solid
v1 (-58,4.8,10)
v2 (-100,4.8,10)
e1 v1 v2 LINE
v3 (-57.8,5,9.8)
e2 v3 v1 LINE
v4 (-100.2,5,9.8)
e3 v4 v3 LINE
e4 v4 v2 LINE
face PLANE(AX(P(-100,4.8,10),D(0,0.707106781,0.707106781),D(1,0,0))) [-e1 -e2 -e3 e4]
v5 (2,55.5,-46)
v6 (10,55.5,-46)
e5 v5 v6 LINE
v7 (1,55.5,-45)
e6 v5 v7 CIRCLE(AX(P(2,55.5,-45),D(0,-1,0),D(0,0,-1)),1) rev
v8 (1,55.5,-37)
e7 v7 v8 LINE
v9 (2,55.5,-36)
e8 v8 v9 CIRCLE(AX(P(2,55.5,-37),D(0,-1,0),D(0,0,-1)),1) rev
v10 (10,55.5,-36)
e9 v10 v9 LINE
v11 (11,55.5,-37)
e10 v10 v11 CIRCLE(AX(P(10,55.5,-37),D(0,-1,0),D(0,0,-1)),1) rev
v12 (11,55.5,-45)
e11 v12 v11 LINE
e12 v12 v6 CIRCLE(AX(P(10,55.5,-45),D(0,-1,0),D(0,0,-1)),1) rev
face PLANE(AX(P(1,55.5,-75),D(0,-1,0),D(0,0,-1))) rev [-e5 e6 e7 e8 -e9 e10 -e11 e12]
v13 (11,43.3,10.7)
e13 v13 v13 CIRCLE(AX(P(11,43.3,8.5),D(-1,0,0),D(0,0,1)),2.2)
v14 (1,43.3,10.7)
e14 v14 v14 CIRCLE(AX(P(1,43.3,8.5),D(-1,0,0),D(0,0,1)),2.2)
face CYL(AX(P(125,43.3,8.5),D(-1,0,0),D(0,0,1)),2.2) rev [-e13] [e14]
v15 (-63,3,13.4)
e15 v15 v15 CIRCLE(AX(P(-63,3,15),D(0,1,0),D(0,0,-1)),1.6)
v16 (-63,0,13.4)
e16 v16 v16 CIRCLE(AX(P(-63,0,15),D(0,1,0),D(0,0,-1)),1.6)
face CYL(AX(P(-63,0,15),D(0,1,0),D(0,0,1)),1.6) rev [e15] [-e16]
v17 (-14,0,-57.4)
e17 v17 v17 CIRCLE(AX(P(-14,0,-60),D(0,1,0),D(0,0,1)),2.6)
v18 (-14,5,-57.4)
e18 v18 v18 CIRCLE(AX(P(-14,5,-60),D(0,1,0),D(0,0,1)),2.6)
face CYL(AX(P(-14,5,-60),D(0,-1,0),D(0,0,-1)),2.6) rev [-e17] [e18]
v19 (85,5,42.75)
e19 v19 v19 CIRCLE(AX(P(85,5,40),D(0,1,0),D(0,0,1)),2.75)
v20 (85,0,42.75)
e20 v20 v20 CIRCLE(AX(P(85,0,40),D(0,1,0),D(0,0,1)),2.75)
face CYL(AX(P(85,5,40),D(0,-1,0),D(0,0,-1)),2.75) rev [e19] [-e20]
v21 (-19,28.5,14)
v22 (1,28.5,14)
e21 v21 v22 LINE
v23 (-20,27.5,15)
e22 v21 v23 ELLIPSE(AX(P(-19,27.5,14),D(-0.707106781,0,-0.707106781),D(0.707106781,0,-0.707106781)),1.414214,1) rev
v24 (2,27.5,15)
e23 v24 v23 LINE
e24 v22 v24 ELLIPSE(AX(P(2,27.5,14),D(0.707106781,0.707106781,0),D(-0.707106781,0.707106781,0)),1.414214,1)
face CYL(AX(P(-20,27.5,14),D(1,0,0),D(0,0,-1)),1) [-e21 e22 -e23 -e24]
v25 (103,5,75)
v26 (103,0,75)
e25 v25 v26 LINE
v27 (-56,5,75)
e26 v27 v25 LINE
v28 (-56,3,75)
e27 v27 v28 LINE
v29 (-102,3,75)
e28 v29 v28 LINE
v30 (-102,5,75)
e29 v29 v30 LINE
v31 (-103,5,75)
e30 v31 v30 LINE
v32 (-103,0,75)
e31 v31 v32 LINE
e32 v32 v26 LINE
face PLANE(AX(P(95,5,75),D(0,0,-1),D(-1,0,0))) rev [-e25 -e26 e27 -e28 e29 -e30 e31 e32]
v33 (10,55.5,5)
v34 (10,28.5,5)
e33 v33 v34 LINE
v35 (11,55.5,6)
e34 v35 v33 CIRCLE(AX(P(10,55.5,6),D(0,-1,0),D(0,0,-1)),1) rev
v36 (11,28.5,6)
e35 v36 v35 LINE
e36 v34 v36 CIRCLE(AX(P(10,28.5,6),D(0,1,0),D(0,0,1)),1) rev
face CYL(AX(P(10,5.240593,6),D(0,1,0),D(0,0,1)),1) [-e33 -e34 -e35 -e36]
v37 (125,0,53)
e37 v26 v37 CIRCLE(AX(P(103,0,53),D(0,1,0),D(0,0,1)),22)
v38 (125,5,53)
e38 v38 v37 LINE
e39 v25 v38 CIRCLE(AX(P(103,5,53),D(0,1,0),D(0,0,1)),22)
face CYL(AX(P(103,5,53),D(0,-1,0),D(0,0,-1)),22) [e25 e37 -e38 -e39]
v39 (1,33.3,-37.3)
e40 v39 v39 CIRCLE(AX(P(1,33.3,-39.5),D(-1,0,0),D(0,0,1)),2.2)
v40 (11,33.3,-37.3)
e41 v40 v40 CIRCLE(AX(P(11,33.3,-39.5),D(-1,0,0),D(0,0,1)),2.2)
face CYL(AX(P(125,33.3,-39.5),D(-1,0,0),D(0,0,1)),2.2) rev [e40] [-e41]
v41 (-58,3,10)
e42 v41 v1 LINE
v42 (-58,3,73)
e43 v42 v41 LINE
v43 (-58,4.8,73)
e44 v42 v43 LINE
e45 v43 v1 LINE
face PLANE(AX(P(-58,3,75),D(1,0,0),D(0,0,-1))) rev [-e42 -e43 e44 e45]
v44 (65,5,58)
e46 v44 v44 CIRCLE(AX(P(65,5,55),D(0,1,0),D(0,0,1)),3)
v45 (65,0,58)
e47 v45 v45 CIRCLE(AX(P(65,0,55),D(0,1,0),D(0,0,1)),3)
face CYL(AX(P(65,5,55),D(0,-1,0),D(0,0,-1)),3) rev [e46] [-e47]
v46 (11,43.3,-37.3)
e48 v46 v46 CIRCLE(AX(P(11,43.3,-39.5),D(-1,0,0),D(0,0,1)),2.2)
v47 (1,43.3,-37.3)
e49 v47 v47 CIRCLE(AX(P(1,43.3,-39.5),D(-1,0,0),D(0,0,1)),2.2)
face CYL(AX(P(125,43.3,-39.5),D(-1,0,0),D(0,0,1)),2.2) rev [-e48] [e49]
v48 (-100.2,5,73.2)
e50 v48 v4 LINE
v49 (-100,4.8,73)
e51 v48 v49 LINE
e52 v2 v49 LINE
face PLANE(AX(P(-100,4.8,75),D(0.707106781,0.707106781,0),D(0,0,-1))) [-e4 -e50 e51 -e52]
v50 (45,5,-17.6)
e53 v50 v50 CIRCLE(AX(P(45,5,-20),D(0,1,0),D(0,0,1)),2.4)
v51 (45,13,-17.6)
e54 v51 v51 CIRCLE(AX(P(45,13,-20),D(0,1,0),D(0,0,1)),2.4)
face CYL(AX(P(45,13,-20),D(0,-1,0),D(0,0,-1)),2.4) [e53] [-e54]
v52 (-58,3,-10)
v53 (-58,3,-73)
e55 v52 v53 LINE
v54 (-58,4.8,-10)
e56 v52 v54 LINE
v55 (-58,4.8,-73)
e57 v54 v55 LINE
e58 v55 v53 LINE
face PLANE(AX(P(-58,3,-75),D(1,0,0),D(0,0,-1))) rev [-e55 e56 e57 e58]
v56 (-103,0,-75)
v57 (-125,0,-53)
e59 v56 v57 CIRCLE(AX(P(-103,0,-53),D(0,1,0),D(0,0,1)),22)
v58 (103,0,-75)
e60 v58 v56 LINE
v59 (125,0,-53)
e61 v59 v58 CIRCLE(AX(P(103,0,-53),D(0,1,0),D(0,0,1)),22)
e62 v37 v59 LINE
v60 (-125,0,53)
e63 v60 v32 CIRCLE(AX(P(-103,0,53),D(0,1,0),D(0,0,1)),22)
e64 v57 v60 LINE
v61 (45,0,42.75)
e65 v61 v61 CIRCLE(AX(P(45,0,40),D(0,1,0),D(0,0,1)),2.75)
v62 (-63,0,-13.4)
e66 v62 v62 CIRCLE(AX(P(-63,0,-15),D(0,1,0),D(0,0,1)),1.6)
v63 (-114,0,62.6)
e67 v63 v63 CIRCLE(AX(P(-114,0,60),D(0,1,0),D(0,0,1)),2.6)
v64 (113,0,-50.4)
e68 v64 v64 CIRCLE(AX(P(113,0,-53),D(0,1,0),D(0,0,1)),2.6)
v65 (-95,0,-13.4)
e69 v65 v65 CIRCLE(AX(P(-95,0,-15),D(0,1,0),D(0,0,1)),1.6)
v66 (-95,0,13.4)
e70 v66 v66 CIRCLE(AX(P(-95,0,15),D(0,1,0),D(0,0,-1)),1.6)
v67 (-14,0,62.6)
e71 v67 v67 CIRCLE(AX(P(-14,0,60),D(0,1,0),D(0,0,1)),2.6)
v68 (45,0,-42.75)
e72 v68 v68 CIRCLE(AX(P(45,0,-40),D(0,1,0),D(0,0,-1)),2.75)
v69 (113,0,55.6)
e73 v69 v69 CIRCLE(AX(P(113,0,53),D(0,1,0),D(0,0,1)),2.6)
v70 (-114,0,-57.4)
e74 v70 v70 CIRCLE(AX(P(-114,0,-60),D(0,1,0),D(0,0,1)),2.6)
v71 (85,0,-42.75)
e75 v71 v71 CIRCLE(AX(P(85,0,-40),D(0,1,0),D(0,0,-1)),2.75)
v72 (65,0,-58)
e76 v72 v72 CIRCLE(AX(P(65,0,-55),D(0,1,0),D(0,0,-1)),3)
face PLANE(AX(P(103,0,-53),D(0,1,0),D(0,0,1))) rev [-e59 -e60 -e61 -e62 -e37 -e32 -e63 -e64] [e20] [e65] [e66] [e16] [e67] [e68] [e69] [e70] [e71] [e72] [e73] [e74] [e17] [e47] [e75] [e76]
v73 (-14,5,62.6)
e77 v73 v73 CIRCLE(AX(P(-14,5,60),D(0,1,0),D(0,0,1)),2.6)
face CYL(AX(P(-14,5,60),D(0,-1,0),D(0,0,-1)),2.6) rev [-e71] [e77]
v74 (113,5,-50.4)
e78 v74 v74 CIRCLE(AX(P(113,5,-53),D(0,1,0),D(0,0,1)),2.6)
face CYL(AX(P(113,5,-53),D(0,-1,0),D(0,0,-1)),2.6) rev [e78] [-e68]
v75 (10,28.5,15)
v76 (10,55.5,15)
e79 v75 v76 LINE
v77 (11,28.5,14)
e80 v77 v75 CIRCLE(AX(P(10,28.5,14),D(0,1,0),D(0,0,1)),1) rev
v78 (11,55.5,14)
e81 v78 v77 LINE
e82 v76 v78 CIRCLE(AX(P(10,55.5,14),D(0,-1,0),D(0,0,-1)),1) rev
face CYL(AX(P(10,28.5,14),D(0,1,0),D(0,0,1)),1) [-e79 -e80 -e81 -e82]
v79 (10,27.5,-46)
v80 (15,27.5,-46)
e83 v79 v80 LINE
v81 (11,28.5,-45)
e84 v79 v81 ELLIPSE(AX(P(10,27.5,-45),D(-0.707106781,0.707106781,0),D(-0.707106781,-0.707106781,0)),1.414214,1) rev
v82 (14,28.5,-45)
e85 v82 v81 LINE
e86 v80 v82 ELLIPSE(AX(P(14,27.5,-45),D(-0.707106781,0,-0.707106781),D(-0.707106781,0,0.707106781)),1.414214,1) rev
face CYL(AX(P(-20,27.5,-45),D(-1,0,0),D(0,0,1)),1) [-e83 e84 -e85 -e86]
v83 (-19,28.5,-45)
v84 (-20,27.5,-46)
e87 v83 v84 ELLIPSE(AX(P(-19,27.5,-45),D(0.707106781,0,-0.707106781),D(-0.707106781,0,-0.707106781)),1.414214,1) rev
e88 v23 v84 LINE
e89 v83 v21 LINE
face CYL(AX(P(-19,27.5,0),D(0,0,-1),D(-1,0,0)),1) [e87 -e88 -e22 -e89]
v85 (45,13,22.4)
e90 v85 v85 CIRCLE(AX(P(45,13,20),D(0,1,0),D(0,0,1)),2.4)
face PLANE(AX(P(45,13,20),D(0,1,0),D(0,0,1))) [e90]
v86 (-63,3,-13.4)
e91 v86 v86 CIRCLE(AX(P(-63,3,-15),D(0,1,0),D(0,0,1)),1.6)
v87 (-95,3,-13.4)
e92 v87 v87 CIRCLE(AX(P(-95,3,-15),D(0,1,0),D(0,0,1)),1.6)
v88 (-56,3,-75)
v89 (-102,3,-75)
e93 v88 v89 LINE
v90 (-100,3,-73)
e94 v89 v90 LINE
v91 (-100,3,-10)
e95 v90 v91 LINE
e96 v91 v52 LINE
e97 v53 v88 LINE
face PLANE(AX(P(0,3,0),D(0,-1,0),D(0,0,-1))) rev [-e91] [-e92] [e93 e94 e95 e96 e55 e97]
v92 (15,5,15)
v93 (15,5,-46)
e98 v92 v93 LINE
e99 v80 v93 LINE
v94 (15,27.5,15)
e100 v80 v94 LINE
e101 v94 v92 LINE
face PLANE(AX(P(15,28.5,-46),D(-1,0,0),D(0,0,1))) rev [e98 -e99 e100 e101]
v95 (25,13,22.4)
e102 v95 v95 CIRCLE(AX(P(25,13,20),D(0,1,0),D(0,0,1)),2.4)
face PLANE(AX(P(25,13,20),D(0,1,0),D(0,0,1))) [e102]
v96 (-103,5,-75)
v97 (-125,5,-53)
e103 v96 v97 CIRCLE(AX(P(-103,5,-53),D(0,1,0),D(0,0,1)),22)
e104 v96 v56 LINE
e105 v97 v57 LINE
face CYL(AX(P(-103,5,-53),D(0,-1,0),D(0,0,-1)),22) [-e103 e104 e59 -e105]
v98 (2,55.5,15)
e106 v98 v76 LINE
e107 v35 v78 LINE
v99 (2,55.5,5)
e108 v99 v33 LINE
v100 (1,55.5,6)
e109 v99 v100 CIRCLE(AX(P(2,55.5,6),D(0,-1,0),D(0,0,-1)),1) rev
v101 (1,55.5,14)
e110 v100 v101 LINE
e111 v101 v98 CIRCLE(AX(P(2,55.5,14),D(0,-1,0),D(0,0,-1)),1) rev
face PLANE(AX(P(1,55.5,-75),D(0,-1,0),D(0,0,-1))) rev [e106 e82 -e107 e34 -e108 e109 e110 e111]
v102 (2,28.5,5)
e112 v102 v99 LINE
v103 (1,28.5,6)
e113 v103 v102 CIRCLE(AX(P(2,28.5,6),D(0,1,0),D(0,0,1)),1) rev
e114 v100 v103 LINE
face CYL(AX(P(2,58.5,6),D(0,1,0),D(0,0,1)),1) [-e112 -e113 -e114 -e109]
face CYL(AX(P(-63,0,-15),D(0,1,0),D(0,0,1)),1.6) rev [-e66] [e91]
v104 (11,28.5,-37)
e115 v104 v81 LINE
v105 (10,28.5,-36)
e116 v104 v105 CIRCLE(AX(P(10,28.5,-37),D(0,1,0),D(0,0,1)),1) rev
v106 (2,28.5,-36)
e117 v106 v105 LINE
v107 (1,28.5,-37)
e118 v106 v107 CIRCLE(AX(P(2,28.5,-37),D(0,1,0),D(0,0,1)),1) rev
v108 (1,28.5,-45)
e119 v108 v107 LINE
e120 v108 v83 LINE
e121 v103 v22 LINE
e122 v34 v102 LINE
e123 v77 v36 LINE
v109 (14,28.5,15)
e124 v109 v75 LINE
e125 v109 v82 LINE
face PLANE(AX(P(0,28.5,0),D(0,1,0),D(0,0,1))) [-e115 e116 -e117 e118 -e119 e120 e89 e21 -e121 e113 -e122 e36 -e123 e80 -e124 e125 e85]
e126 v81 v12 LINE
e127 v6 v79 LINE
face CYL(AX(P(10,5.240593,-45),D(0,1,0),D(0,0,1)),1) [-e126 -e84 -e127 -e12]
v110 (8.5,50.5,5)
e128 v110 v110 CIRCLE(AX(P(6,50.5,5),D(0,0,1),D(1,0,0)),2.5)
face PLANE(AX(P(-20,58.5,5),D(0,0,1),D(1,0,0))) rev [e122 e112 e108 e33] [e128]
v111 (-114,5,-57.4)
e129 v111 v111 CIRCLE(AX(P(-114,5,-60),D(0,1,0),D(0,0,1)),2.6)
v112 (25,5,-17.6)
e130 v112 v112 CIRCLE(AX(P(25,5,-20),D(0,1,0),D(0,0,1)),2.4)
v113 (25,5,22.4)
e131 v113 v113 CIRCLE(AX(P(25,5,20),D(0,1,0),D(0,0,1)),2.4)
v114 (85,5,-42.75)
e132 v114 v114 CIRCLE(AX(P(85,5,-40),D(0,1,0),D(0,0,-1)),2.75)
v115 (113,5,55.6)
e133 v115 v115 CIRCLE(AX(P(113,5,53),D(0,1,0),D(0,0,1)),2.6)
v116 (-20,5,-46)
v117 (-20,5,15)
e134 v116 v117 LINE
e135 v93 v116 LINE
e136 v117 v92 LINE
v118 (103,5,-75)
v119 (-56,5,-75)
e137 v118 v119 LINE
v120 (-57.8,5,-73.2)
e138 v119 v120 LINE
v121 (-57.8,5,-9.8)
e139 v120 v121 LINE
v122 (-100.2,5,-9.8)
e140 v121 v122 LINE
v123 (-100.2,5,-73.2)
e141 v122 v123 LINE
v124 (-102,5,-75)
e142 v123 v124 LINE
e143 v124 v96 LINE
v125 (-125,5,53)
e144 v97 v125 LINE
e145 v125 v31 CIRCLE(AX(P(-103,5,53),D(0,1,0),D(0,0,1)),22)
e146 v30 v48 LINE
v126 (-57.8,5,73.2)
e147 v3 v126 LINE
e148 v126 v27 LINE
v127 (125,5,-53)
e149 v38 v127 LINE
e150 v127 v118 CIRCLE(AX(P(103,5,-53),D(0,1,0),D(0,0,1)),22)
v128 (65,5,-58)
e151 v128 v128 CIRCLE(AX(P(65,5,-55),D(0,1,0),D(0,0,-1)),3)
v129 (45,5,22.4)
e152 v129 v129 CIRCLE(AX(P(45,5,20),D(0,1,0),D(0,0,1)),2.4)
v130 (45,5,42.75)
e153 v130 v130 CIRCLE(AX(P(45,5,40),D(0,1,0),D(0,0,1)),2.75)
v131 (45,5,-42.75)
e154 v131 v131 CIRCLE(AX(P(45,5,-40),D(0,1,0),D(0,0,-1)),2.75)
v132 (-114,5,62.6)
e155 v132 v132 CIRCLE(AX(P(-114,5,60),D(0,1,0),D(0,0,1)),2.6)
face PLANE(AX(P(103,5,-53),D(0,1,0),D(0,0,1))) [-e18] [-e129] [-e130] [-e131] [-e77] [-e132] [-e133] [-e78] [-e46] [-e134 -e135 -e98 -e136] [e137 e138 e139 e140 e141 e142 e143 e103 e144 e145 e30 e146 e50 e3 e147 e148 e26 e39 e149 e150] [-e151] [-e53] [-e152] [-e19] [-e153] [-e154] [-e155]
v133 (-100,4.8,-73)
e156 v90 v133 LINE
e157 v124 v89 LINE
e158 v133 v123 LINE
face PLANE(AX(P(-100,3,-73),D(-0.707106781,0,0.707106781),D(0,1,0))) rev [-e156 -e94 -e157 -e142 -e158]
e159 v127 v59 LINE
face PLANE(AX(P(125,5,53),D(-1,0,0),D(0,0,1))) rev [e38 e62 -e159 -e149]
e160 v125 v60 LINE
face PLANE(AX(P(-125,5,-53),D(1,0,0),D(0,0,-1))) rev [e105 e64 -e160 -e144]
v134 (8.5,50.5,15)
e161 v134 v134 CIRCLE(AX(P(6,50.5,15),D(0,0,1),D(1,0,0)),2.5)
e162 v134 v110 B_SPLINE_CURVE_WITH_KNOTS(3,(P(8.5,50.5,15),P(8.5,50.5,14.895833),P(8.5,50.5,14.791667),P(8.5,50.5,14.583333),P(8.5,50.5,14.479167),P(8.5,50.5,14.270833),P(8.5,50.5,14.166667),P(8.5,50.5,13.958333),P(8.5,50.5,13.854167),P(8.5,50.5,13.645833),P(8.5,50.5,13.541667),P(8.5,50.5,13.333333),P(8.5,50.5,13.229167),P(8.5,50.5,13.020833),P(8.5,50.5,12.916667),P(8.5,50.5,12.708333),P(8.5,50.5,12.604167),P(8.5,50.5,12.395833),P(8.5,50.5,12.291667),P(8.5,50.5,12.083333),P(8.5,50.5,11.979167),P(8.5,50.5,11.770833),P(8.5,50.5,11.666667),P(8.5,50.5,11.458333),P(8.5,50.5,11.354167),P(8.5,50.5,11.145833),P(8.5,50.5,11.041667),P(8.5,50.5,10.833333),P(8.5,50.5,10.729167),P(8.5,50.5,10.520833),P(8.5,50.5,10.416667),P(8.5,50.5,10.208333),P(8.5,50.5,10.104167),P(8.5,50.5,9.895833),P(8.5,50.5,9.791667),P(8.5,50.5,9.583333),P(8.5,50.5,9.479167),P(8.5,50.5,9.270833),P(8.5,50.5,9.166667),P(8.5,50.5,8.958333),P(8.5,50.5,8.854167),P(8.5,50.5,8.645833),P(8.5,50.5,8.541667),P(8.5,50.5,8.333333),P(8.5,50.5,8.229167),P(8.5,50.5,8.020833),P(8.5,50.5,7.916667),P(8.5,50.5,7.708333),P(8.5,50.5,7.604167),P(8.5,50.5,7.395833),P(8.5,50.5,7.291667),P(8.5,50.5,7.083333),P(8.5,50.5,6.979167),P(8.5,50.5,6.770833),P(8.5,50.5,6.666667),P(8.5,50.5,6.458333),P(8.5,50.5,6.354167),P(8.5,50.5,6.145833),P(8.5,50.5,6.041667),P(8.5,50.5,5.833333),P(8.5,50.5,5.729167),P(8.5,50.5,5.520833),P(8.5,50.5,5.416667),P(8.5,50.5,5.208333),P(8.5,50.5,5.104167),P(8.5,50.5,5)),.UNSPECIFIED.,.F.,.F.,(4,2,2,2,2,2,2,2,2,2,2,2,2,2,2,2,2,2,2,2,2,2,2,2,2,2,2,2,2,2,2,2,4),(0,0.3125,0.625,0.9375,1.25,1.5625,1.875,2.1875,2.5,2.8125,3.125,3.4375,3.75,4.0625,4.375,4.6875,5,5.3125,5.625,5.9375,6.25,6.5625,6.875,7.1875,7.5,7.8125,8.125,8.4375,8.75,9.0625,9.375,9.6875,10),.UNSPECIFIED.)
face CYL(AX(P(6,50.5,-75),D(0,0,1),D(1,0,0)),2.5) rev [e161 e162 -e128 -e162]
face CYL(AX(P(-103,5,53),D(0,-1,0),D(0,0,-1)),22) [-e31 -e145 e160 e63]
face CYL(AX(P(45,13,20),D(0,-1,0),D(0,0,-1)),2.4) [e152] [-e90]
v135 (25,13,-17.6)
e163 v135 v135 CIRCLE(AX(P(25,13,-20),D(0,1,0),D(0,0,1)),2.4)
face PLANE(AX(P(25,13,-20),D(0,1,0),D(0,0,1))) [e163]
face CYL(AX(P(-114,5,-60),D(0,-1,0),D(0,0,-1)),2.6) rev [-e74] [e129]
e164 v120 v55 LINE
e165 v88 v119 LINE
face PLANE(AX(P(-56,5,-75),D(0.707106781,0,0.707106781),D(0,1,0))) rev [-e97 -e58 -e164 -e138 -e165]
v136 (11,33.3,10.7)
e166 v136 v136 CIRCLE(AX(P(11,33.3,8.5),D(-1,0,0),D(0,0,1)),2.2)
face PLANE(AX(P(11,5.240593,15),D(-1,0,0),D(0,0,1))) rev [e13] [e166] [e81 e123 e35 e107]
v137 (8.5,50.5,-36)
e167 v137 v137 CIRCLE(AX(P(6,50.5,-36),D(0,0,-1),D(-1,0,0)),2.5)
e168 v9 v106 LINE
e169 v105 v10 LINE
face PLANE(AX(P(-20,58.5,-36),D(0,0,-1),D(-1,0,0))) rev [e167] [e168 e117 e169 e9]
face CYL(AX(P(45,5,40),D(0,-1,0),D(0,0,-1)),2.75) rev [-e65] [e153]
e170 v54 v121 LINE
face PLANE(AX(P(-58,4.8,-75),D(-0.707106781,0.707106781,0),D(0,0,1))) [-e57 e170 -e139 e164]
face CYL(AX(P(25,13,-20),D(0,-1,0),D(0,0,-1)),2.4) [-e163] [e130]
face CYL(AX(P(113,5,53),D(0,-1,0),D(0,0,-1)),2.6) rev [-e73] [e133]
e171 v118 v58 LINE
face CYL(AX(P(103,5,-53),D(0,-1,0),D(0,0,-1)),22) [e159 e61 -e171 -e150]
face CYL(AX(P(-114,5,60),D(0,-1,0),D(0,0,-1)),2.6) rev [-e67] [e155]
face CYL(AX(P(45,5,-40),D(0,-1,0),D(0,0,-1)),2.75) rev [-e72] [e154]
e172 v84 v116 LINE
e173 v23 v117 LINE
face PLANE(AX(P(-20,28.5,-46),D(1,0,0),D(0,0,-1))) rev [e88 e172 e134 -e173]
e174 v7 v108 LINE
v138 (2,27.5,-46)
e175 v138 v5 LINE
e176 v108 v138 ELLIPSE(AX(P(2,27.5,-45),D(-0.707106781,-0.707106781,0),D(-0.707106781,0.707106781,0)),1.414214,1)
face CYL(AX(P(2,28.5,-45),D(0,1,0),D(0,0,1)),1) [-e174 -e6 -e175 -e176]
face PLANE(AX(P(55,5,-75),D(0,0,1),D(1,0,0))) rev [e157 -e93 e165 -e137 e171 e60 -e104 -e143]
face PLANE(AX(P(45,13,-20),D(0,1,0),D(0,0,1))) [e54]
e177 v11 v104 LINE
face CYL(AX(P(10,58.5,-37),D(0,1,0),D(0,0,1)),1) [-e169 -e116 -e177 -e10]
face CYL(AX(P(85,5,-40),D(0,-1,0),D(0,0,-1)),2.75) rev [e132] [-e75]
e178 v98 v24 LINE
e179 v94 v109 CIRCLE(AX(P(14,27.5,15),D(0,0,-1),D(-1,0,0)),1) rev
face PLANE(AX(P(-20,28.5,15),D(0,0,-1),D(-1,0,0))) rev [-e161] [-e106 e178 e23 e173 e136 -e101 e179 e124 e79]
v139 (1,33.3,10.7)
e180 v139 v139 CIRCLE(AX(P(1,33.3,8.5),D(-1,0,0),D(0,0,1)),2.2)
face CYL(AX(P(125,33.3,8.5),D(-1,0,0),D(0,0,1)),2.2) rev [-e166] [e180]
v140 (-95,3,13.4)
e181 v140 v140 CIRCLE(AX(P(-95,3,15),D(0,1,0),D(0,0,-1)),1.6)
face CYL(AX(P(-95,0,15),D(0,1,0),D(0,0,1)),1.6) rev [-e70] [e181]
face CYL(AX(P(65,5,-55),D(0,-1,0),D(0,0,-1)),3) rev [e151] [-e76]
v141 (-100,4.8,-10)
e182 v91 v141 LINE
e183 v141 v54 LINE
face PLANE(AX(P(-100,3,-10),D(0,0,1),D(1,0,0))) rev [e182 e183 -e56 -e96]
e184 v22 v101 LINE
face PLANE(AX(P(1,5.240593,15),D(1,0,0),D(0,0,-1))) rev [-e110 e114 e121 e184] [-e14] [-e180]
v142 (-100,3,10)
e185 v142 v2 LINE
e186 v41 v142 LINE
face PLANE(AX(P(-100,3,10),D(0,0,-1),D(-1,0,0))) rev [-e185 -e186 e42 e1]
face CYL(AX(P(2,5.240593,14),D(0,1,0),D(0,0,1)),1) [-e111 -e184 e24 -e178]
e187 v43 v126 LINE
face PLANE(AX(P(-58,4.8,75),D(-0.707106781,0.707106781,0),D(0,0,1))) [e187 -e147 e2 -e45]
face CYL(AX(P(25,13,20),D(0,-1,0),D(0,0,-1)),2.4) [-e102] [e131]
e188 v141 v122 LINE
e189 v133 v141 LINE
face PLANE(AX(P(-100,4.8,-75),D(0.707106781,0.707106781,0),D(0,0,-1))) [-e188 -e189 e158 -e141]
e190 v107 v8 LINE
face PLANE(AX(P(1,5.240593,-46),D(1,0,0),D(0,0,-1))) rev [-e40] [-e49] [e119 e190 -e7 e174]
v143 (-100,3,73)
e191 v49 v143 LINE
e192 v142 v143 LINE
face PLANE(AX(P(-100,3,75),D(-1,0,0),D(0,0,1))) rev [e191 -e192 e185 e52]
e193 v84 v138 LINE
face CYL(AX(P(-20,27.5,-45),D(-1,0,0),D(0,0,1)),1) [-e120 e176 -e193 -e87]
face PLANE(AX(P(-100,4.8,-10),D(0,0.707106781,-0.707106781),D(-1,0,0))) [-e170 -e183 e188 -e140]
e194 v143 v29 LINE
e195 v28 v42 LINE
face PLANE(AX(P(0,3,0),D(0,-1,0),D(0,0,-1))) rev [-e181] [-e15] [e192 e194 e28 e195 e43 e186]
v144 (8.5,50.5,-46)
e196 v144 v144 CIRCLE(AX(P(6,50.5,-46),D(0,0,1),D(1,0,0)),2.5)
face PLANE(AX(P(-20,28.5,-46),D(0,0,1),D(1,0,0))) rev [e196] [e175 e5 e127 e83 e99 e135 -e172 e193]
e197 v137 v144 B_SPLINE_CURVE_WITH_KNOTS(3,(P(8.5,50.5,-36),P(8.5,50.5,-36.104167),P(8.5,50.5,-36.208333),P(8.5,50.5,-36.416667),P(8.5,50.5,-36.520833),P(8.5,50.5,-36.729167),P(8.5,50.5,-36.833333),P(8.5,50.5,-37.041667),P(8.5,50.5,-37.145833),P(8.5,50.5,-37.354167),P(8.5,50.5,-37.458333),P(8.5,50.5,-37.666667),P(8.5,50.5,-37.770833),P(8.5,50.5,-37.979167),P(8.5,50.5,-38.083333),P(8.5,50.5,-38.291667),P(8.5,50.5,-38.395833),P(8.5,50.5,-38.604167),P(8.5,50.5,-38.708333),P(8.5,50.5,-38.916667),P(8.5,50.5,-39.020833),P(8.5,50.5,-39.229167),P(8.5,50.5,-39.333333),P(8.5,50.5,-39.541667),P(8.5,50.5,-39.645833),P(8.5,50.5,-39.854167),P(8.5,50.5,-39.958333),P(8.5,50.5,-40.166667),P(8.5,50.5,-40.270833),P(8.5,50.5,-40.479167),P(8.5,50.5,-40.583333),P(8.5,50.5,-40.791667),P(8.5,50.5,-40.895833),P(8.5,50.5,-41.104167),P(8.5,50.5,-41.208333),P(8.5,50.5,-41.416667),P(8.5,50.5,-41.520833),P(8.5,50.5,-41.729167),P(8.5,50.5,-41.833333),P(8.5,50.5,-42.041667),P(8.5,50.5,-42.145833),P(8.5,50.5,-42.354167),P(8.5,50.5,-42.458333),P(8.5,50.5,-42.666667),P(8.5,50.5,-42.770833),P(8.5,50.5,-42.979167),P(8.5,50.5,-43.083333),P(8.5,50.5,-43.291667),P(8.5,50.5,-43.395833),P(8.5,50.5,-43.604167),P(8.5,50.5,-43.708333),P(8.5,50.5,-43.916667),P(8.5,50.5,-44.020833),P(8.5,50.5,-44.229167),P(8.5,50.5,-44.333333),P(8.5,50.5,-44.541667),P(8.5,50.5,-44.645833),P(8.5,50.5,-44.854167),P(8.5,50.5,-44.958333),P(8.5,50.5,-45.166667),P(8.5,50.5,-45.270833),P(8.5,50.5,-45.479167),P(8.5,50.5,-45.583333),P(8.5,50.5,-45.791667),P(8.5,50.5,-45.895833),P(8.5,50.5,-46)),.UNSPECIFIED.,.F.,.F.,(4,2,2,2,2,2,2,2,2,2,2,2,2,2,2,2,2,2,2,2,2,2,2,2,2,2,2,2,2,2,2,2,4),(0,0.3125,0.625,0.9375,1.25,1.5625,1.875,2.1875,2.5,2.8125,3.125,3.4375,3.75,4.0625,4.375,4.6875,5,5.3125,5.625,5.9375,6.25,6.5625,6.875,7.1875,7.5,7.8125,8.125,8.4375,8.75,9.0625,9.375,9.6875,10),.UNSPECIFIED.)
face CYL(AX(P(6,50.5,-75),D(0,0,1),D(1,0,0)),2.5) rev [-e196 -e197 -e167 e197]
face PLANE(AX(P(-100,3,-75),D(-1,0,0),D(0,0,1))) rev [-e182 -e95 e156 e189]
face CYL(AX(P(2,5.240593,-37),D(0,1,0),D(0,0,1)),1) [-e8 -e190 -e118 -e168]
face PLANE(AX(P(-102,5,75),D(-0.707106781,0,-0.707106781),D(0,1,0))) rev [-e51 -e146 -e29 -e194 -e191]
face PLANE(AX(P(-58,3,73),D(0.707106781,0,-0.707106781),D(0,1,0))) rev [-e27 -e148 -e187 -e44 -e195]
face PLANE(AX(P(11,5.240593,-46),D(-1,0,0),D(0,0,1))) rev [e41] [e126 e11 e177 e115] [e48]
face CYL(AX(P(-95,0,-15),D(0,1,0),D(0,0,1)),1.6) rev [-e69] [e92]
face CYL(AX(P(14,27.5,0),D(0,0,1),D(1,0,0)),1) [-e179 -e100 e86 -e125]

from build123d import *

# Parameters (mm, degrees)
SKETCH_1_R          = 2.6
SKETCH_1_R_2        = 3
SKETCH_1_R_3        = 2.75
EXTRUDE_1_DEPTH     = 5
SKETCH_2_W          = 42
SKETCH_2_H          = 65
CUT_EXTRUDE_1_DEPTH = 2
CHAMFER_1_SIZE      = 0.2
SKETCH_3_R          = 1.6
CUT_EXTRUDE_2_DEPTH = 3
CHAMFER_2_SIZE      = 2
SKETCH_4_R          = 2.4
EXTRUDE_2_DEPTH     = 8
SKETCH_5_W          = 35
SKETCH_5_H          = 61
EXTRUDE_3_DEPTH     = 23.5
SKETCH_7_W          = 35
SKETCH_7_H          = 10
EXTRUDE_4_DEPTH     = 30
SKETCH_8_W          = 4
SKETCH_8_H          = 10
SKETCH_8_W_2        = 21
CUT_EXTRUDE_3_DEPTH = 30
FILLET_1_R          = 1
SKETCH_9_R          = 2.2
CUT_EXTRUDE_4_DEPTH = 158.870991636
SKETCH_10_R         = 2.5
SKETCH_10_W         = 10
SKETCH_10_H         = 3
CUT_EXTRUDE_5_DEPTH = 165.764225486


with BuildPart() as part:
    # 草图1 → 凸台-拉伸1 (new body)
    with BuildSketch(Plane(origin=(0, 0, 0), x_dir=(1, 0, 0), z_dir=(0, 1, 0))):
        with BuildLine():
            Line((103, 75), (95, 75))
            Line((95, 75), (55, 75))
            Line((55, 75), (-103, 75))
            ThreePointArc((-103, 75), (-118.556349186, 68.556349186), (-125, 53))
            Line((-125, 53), (-125, -53))
            ThreePointArc((-125, -53), (-118.556349186, -68.556349186), (-103, -75))
            Line((-103, -75), (55, -75))
            Line((55, -75), (95, -75))
            Line((95, -75), (103, -75))
            ThreePointArc((103, -75), (118.556349186, -68.556349186), (125, -53))
            Line((125, -53), (125, 53))
            ThreePointArc((125, 53), (118.556349186, 68.556349186), (103, 75))
        make_face()
        with Locations(Location((-114, 60, 0), (0, 0, 270))):
            Circle(SKETCH_1_R, mode=Mode.SUBTRACT)
        with Locations(Location((-14, 60, 0), (0, 0, 270))):
            Circle(SKETCH_1_R, mode=Mode.SUBTRACT)
        with Locations(Location((113, 53, 0), (0, 0, 270))):
            Circle(SKETCH_1_R, mode=Mode.SUBTRACT)
        with Locations(Location((-114, -60, 0), (0, 0, 270))):
            Circle(SKETCH_1_R, mode=Mode.SUBTRACT)
        with Locations(Location((-14, -60, 0), (0, 0, 270))):
            Circle(SKETCH_1_R, mode=Mode.SUBTRACT)
        with Locations(Location((113, -53, 0), (0, 0, 270))):
            Circle(SKETCH_1_R, mode=Mode.SUBTRACT)
        with Locations(Location((65, -55, 0), (0, 0, 270))):
            Circle(SKETCH_1_R_2, mode=Mode.SUBTRACT)
        with Locations(Location((65, 55, 0), (0, 0, 90))):
            Circle(SKETCH_1_R_2, mode=Mode.SUBTRACT)
        with Locations(Location((45, -40, 0), (0, 0, 270))):
            Circle(SKETCH_1_R_3, mode=Mode.SUBTRACT)
        with Locations(Location((85, -40, 0), (0, 0, 270))):
            Circle(SKETCH_1_R_3, mode=Mode.SUBTRACT)
        with Locations(Location((85, 40, 0), (0, 0, 90))):
            Circle(SKETCH_1_R_3, mode=Mode.SUBTRACT)
        with Locations(Location((45, 40, 0), (0, 0, 90))):
            Circle(SKETCH_1_R_3, mode=Mode.SUBTRACT)
    extrude(amount=EXTRUDE_1_DEPTH)

    # 草图2 → 切除-拉伸1 (cut)
    with BuildSketch(Plane(origin=(0, 5, 0), x_dir=(1, 0, 0), z_dir=(0, 1, 0))):
        with Locations((-79, -42.5)):
            Rectangle(SKETCH_2_W, SKETCH_2_H)
        with Locations((-79, 42.5)):
            Rectangle(SKETCH_2_W, SKETCH_2_H)
    extrude(amount=-CUT_EXTRUDE_1_DEPTH, mode=Mode.SUBTRACT)

    # 倒角1
    chamfer_1_edges = [part.edges().sort_by_distance(p)[0] for p in [
        (-58, 5, 42.5),
        (-79, 5, 10),
        (-100, 5, -42.5),
        (-79, 5, -10),
        (-58, 5, -42.5),
        (-100, 5, 42.5),
    ]]
    chamfer(chamfer_1_edges, length=CHAMFER_1_SIZE)

    # 草图3 → 切除-拉伸2 (cut)
    with BuildSketch(Plane(origin=(0, 3, 0), x_dir=(1, 0, 0), z_dir=(0, 1, 0))):
        with Locations(Location((-95, 15, 0), (0, 0, 270))):
            Circle(SKETCH_3_R)
        with Locations(Location((-63, 15, 0), (0, 0, 270))):
            Circle(SKETCH_3_R)
        with Locations(Location((-63, -15, 0), (0, 0, 90))):
            Circle(SKETCH_3_R)
        with Locations(Location((-95, -15, 0), (0, 0, 90))):
            Circle(SKETCH_3_R)
    extrude(amount=-CUT_EXTRUDE_2_DEPTH, mode=Mode.SUBTRACT)

    # 倒角2
    chamfer_2_edges = [part.edges().sort_by_distance(p)[0] for p in [
        (-100, 3.9, -75),
        (-58, 3.9, -75),
        (-58, 3.9, 75),
        (-100, 3.9, 75),
    ]]
    chamfer(chamfer_2_edges, length=CHAMFER_2_SIZE)

    # 草图4 → 凸台-拉伸2 (add)
    with BuildSketch(Plane(origin=(0, 5, 0), x_dir=(1, 0, 0), z_dir=(0, 1, 0))):
        with Locations(Location((25, 20, 0), (0, 0, 270))):
            Circle(SKETCH_4_R)
        with Locations(Location((45, 20, 0), (0, 0, 270))):
            Circle(SKETCH_4_R)
        with Locations(Location((45, -20, 0), (0, 0, 270))):
            Circle(SKETCH_4_R)
        with Locations(Location((25, -20, 0), (0, 0, 270))):
            Circle(SKETCH_4_R)
    extrude(amount=EXTRUDE_2_DEPTH)

    # 草图5 → 凸台-拉伸3 (add)
    with BuildSketch(Plane(origin=(0, 5, 0), x_dir=(1, 0, 0), z_dir=(0, 1, 0))):
        with Locations((-2.5, 15.5)):
            Rectangle(SKETCH_5_W, SKETCH_5_H)
    extrude(amount=EXTRUDE_3_DEPTH)

    # 草图7 → 凸台-拉伸4 (add)
    with BuildSketch(Plane(origin=(0, 28.5, 0), x_dir=(1, 0, 0), z_dir=(0, 1, 0))):
        with Locations((-2.5, 41)):
            Rectangle(SKETCH_7_W, SKETCH_7_H)
        with Locations((-2.5, -10)):
            Rectangle(SKETCH_7_W, SKETCH_7_H)
    extrude(amount=EXTRUDE_4_DEPTH)

    # 草图8 → 切除-拉伸3 (cut)
    with BuildSketch(Plane(origin=(0, 58.5, 0), x_dir=(1, 0, 0), z_dir=(0, 1, 0))):
        with Locations((13, 41)):
            Rectangle(SKETCH_8_W, SKETCH_8_H)
        with Locations((-9.5, 41)):
            Rectangle(SKETCH_8_W_2, SKETCH_8_H)
        with Locations((13, -10)):
            Rectangle(SKETCH_8_W, SKETCH_8_H)
        with Locations((-9.5, -10)):
            Rectangle(SKETCH_8_W_2, SKETCH_8_H)
    extrude(amount=-CUT_EXTRUDE_3_DEPTH, mode=Mode.SUBTRACT)

    # 圆角1
    # the kernel refuses this fillet: 1 mm, written as the material it takes off along each edge
    with BuildSketch(Plane(origin=(17.5, 28.5, -46), x_dir=(0, -1, 0), z_dir=(-1, 0, 0))) as fillet_1_piece_1:
        with BuildLine():
            CenterArc((FILLET_1_R, FILLET_1_R), FILLET_1_R, 180, 90)
            Line((0, FILLET_1_R), (0, 0))
            Line((0, 0), (FILLET_1_R, 0))
        make_face()
    extrude(amount=6.5, mode=Mode.SUBTRACT)
    with BuildSketch(Plane(origin=(11, 61, -46), x_dir=(-1, 0, 0), z_dir=(0, -1, 0)), Plane(origin=(1, 61, 5), x_dir=(0, 0, 1), z_dir=(0, -1, 0)), Plane(origin=(11, 61, 5), x_dir=(-1, 0, 0), z_dir=(0, -1, 0)), Plane(origin=(11, 61, 15), x_dir=(0, 0, -1), z_dir=(0, -1, 0))) as fillet_1_piece_2:
        with BuildLine():
            CenterArc((FILLET_1_R, -FILLET_1_R), FILLET_1_R, 90, 90)
            Line((0, -FILLET_1_R), (0, 0))
            Line((0, 0), (FILLET_1_R, 0))
        make_face()
    extrude(amount=32.5, mode=Mode.SUBTRACT)
    with BuildSketch(Plane(origin=(1, 61, -46), x_dir=(1, 0, 0), z_dir=(0, -1, 0)), Plane(origin=(1, 61, -36), x_dir=(0, 0, -1), z_dir=(0, -1, 0)), Plane(origin=(11, 61, -36), x_dir=(-1, 0, 0), z_dir=(0, -1, 0)), Plane(origin=(1, 61, 15), x_dir=(0, 0, -1), z_dir=(0, -1, 0))) as fillet_1_piece_3:
        with BuildLine():
            CenterArc((FILLET_1_R, FILLET_1_R), FILLET_1_R, 180, 90)
            Line((0, FILLET_1_R), (0, 0))
            Line((0, 0), (FILLET_1_R, 0))
        make_face()
    extrude(amount=32.5, mode=Mode.SUBTRACT)
    with BuildSketch(Plane(origin=(-22.5, 28.5, -46), x_dir=(0, -1, 0), z_dir=(1, 0, 0))) as fillet_1_piece_4:
        with BuildLine():
            CenterArc((FILLET_1_R, -FILLET_1_R), FILLET_1_R, 90, 90)
            Line((0, -FILLET_1_R), (0, 0))
            Line((0, 0), (FILLET_1_R, 0))
        make_face()
    extrude(amount=23.5, mode=Mode.SUBTRACT)
    with BuildSketch(Plane(origin=(15, 28.5, -48.5), x_dir=(-1, 0, 0), z_dir=(0, 0, 1)), Plane(origin=(-20, 28.5, 17.5), x_dir=(1, 0, 0), z_dir=(0, 0, -1))) as fillet_1_piece_5:
        with BuildLine():
            CenterArc((FILLET_1_R, FILLET_1_R), FILLET_1_R, 180, 90)
            Line((0, FILLET_1_R), (0, 0))
            Line((0, 0), (FILLET_1_R, 0))
        make_face()
    extrude(amount=66, mode=Mode.SUBTRACT)
    with BuildSketch(Plane(origin=(1, 28.5, 15), x_dir=(0, 0, -1), z_dir=(-1, 0, 0))) as fillet_1_piece_6:
        with BuildLine():
            CenterArc((FILLET_1_R, FILLET_1_R), FILLET_1_R, 180, 90)
            Line((0, FILLET_1_R), (0, 0))
            Line((0, 0), (FILLET_1_R, 0))
        make_face()
    extrude(amount=23.5, mode=Mode.SUBTRACT)
    with BuildSketch(Plane(origin=(17.5, 28.5, -46), x_dir=(0, -1, 0), z_dir=(-1, 0, 0))) as fillet_1_piece_7a_section:
        with BuildLine():
            CenterArc((FILLET_1_R, FILLET_1_R), FILLET_1_R, 180, 90)
            Line((0, FILLET_1_R), (0, 0))
            Line((0, 0), (FILLET_1_R, 0))
        make_face()
    fillet_1_piece_7a = extrude(amount=9, mode=Mode.PRIVATE)
    fillet_1_piece_7a = split(fillet_1_piece_7a, bisect_by=Plane(origin=(11, 28.273604886, -45.773604886), z_dir=(-1, 0, 0)), keep=Keep.TOP, mode=Mode.PRIVATE)
    with BuildSketch(Plane(origin=(11, 61, -46), x_dir=(-1, 0, 0), z_dir=(0, -1, 0))) as fillet_1_piece_7b_section:
        with BuildLine():
            CenterArc((FILLET_1_R, -FILLET_1_R), FILLET_1_R, 90, 90)
            Line((0, -FILLET_1_R), (0, 0))
            Line((0, 0), (FILLET_1_R, 0))
        make_face()
    fillet_1_piece_7b = extrude(amount=35, mode=Mode.PRIVATE)
    fillet_1_piece_7b = split(fillet_1_piece_7b, bisect_by=Plane(origin=(10.773604886, 28.5, -45.773604886), z_dir=(0, -1, 0)), keep=Keep.TOP, mode=Mode.PRIVATE)
    fillet_1_piece_7 = fillet_1_piece_7a & fillet_1_piece_7b
    add(fillet_1_piece_7, mode=Mode.SUBTRACT)
    with BuildSketch(Plane(origin=(1, 61, -46), x_dir=(1, 0, 0), z_dir=(0, -1, 0))) as fillet_1_piece_8a_section:
        with BuildLine():
            CenterArc((FILLET_1_R, FILLET_1_R), FILLET_1_R, 180, 90)
            Line((0, FILLET_1_R), (0, 0))
            Line((0, 0), (FILLET_1_R, 0))
        make_face()
    fillet_1_piece_8a = extrude(amount=35, mode=Mode.PRIVATE)
    fillet_1_piece_8a = split(fillet_1_piece_8a, bisect_by=Plane(origin=(1.226395114, 28.5, -45.773604886), z_dir=(0, -1, 0)), keep=Keep.TOP, mode=Mode.PRIVATE)
    with BuildSketch(Plane(origin=(-22.5, 28.5, -46), x_dir=(0, -1, 0), z_dir=(1, 0, 0))) as fillet_1_piece_8b_section:
        with BuildLine():
            CenterArc((FILLET_1_R, -FILLET_1_R), FILLET_1_R, 90, 90)
            Line((0, -FILLET_1_R), (0, 0))
            Line((0, 0), (FILLET_1_R, 0))
        make_face()
    fillet_1_piece_8b = extrude(amount=26, mode=Mode.PRIVATE)
    fillet_1_piece_8b = split(fillet_1_piece_8b, bisect_by=Plane(origin=(1, 28.273604886, -45.773604886), z_dir=(1, 0, 0)), keep=Keep.TOP, mode=Mode.PRIVATE)
    fillet_1_piece_8 = fillet_1_piece_8a & fillet_1_piece_8b
    add(fillet_1_piece_8, mode=Mode.SUBTRACT)
    with BuildSketch(Plane(origin=(3.5, 28.5, 15), x_dir=(0, 0, -1), z_dir=(-1, 0, 0))) as fillet_1_piece_9a_section:
        with BuildLine():
            CenterArc((FILLET_1_R, FILLET_1_R), FILLET_1_R, 180, 90)
            Line((0, FILLET_1_R), (0, 0))
            Line((0, 0), (FILLET_1_R, 0))
        make_face()
    fillet_1_piece_9a = extrude(amount=26, mode=Mode.PRIVATE)
    fillet_1_piece_9a = split(fillet_1_piece_9a, bisect_by=Plane(origin=(1, 28.273604886, 14.773604886), z_dir=(1, 0, 0)), keep=Keep.TOP, mode=Mode.PRIVATE)
    with BuildSketch(Plane(origin=(1, 61, 15), x_dir=(0, 0, -1), z_dir=(0, -1, 0))) as fillet_1_piece_9b_section:
        with BuildLine():
            CenterArc((FILLET_1_R, FILLET_1_R), FILLET_1_R, 180, 90)
            Line((0, FILLET_1_R), (0, 0))
            Line((0, 0), (FILLET_1_R, 0))
        make_face()
    fillet_1_piece_9b = extrude(amount=35, mode=Mode.PRIVATE)
    fillet_1_piece_9b = split(fillet_1_piece_9b, bisect_by=Plane(origin=(1.226395114, 28.5, 14.773604886), z_dir=(0, -1, 0)), keep=Keep.TOP, mode=Mode.PRIVATE)
    fillet_1_piece_9 = fillet_1_piece_9a & fillet_1_piece_9b
    add(fillet_1_piece_9, mode=Mode.SUBTRACT)

    # 草图9 → 切除-拉伸4 (cut, through all)
    with BuildSketch(Plane.ZY.offset(-1)):
        with Locations((-39.5, 43.3)):
            Circle(SKETCH_9_R)
        with Locations((-39.5, 33.3)):
            Circle(SKETCH_9_R)
        with Locations((8.5, 43.3)):
            Circle(SKETCH_9_R)
        with Locations((8.5, 33.3)):
            Circle(SKETCH_9_R)
    extrude(amount=-CUT_EXTRUDE_4_DEPTH, mode=Mode.SUBTRACT)

    # 草图10 → 切除-拉伸5 (cut, through all)
    with BuildSketch(Plane.XY.offset(15)):
        with Locations((6, 50.5)):
            Circle(SKETCH_10_R)
        with Locations((6, 57)):
            Rectangle(SKETCH_10_W, SKETCH_10_H)
    extrude(amount=-CUT_EXTRUDE_5_DEPTH, mode=Mode.SUBTRACT)


solid = part.part
